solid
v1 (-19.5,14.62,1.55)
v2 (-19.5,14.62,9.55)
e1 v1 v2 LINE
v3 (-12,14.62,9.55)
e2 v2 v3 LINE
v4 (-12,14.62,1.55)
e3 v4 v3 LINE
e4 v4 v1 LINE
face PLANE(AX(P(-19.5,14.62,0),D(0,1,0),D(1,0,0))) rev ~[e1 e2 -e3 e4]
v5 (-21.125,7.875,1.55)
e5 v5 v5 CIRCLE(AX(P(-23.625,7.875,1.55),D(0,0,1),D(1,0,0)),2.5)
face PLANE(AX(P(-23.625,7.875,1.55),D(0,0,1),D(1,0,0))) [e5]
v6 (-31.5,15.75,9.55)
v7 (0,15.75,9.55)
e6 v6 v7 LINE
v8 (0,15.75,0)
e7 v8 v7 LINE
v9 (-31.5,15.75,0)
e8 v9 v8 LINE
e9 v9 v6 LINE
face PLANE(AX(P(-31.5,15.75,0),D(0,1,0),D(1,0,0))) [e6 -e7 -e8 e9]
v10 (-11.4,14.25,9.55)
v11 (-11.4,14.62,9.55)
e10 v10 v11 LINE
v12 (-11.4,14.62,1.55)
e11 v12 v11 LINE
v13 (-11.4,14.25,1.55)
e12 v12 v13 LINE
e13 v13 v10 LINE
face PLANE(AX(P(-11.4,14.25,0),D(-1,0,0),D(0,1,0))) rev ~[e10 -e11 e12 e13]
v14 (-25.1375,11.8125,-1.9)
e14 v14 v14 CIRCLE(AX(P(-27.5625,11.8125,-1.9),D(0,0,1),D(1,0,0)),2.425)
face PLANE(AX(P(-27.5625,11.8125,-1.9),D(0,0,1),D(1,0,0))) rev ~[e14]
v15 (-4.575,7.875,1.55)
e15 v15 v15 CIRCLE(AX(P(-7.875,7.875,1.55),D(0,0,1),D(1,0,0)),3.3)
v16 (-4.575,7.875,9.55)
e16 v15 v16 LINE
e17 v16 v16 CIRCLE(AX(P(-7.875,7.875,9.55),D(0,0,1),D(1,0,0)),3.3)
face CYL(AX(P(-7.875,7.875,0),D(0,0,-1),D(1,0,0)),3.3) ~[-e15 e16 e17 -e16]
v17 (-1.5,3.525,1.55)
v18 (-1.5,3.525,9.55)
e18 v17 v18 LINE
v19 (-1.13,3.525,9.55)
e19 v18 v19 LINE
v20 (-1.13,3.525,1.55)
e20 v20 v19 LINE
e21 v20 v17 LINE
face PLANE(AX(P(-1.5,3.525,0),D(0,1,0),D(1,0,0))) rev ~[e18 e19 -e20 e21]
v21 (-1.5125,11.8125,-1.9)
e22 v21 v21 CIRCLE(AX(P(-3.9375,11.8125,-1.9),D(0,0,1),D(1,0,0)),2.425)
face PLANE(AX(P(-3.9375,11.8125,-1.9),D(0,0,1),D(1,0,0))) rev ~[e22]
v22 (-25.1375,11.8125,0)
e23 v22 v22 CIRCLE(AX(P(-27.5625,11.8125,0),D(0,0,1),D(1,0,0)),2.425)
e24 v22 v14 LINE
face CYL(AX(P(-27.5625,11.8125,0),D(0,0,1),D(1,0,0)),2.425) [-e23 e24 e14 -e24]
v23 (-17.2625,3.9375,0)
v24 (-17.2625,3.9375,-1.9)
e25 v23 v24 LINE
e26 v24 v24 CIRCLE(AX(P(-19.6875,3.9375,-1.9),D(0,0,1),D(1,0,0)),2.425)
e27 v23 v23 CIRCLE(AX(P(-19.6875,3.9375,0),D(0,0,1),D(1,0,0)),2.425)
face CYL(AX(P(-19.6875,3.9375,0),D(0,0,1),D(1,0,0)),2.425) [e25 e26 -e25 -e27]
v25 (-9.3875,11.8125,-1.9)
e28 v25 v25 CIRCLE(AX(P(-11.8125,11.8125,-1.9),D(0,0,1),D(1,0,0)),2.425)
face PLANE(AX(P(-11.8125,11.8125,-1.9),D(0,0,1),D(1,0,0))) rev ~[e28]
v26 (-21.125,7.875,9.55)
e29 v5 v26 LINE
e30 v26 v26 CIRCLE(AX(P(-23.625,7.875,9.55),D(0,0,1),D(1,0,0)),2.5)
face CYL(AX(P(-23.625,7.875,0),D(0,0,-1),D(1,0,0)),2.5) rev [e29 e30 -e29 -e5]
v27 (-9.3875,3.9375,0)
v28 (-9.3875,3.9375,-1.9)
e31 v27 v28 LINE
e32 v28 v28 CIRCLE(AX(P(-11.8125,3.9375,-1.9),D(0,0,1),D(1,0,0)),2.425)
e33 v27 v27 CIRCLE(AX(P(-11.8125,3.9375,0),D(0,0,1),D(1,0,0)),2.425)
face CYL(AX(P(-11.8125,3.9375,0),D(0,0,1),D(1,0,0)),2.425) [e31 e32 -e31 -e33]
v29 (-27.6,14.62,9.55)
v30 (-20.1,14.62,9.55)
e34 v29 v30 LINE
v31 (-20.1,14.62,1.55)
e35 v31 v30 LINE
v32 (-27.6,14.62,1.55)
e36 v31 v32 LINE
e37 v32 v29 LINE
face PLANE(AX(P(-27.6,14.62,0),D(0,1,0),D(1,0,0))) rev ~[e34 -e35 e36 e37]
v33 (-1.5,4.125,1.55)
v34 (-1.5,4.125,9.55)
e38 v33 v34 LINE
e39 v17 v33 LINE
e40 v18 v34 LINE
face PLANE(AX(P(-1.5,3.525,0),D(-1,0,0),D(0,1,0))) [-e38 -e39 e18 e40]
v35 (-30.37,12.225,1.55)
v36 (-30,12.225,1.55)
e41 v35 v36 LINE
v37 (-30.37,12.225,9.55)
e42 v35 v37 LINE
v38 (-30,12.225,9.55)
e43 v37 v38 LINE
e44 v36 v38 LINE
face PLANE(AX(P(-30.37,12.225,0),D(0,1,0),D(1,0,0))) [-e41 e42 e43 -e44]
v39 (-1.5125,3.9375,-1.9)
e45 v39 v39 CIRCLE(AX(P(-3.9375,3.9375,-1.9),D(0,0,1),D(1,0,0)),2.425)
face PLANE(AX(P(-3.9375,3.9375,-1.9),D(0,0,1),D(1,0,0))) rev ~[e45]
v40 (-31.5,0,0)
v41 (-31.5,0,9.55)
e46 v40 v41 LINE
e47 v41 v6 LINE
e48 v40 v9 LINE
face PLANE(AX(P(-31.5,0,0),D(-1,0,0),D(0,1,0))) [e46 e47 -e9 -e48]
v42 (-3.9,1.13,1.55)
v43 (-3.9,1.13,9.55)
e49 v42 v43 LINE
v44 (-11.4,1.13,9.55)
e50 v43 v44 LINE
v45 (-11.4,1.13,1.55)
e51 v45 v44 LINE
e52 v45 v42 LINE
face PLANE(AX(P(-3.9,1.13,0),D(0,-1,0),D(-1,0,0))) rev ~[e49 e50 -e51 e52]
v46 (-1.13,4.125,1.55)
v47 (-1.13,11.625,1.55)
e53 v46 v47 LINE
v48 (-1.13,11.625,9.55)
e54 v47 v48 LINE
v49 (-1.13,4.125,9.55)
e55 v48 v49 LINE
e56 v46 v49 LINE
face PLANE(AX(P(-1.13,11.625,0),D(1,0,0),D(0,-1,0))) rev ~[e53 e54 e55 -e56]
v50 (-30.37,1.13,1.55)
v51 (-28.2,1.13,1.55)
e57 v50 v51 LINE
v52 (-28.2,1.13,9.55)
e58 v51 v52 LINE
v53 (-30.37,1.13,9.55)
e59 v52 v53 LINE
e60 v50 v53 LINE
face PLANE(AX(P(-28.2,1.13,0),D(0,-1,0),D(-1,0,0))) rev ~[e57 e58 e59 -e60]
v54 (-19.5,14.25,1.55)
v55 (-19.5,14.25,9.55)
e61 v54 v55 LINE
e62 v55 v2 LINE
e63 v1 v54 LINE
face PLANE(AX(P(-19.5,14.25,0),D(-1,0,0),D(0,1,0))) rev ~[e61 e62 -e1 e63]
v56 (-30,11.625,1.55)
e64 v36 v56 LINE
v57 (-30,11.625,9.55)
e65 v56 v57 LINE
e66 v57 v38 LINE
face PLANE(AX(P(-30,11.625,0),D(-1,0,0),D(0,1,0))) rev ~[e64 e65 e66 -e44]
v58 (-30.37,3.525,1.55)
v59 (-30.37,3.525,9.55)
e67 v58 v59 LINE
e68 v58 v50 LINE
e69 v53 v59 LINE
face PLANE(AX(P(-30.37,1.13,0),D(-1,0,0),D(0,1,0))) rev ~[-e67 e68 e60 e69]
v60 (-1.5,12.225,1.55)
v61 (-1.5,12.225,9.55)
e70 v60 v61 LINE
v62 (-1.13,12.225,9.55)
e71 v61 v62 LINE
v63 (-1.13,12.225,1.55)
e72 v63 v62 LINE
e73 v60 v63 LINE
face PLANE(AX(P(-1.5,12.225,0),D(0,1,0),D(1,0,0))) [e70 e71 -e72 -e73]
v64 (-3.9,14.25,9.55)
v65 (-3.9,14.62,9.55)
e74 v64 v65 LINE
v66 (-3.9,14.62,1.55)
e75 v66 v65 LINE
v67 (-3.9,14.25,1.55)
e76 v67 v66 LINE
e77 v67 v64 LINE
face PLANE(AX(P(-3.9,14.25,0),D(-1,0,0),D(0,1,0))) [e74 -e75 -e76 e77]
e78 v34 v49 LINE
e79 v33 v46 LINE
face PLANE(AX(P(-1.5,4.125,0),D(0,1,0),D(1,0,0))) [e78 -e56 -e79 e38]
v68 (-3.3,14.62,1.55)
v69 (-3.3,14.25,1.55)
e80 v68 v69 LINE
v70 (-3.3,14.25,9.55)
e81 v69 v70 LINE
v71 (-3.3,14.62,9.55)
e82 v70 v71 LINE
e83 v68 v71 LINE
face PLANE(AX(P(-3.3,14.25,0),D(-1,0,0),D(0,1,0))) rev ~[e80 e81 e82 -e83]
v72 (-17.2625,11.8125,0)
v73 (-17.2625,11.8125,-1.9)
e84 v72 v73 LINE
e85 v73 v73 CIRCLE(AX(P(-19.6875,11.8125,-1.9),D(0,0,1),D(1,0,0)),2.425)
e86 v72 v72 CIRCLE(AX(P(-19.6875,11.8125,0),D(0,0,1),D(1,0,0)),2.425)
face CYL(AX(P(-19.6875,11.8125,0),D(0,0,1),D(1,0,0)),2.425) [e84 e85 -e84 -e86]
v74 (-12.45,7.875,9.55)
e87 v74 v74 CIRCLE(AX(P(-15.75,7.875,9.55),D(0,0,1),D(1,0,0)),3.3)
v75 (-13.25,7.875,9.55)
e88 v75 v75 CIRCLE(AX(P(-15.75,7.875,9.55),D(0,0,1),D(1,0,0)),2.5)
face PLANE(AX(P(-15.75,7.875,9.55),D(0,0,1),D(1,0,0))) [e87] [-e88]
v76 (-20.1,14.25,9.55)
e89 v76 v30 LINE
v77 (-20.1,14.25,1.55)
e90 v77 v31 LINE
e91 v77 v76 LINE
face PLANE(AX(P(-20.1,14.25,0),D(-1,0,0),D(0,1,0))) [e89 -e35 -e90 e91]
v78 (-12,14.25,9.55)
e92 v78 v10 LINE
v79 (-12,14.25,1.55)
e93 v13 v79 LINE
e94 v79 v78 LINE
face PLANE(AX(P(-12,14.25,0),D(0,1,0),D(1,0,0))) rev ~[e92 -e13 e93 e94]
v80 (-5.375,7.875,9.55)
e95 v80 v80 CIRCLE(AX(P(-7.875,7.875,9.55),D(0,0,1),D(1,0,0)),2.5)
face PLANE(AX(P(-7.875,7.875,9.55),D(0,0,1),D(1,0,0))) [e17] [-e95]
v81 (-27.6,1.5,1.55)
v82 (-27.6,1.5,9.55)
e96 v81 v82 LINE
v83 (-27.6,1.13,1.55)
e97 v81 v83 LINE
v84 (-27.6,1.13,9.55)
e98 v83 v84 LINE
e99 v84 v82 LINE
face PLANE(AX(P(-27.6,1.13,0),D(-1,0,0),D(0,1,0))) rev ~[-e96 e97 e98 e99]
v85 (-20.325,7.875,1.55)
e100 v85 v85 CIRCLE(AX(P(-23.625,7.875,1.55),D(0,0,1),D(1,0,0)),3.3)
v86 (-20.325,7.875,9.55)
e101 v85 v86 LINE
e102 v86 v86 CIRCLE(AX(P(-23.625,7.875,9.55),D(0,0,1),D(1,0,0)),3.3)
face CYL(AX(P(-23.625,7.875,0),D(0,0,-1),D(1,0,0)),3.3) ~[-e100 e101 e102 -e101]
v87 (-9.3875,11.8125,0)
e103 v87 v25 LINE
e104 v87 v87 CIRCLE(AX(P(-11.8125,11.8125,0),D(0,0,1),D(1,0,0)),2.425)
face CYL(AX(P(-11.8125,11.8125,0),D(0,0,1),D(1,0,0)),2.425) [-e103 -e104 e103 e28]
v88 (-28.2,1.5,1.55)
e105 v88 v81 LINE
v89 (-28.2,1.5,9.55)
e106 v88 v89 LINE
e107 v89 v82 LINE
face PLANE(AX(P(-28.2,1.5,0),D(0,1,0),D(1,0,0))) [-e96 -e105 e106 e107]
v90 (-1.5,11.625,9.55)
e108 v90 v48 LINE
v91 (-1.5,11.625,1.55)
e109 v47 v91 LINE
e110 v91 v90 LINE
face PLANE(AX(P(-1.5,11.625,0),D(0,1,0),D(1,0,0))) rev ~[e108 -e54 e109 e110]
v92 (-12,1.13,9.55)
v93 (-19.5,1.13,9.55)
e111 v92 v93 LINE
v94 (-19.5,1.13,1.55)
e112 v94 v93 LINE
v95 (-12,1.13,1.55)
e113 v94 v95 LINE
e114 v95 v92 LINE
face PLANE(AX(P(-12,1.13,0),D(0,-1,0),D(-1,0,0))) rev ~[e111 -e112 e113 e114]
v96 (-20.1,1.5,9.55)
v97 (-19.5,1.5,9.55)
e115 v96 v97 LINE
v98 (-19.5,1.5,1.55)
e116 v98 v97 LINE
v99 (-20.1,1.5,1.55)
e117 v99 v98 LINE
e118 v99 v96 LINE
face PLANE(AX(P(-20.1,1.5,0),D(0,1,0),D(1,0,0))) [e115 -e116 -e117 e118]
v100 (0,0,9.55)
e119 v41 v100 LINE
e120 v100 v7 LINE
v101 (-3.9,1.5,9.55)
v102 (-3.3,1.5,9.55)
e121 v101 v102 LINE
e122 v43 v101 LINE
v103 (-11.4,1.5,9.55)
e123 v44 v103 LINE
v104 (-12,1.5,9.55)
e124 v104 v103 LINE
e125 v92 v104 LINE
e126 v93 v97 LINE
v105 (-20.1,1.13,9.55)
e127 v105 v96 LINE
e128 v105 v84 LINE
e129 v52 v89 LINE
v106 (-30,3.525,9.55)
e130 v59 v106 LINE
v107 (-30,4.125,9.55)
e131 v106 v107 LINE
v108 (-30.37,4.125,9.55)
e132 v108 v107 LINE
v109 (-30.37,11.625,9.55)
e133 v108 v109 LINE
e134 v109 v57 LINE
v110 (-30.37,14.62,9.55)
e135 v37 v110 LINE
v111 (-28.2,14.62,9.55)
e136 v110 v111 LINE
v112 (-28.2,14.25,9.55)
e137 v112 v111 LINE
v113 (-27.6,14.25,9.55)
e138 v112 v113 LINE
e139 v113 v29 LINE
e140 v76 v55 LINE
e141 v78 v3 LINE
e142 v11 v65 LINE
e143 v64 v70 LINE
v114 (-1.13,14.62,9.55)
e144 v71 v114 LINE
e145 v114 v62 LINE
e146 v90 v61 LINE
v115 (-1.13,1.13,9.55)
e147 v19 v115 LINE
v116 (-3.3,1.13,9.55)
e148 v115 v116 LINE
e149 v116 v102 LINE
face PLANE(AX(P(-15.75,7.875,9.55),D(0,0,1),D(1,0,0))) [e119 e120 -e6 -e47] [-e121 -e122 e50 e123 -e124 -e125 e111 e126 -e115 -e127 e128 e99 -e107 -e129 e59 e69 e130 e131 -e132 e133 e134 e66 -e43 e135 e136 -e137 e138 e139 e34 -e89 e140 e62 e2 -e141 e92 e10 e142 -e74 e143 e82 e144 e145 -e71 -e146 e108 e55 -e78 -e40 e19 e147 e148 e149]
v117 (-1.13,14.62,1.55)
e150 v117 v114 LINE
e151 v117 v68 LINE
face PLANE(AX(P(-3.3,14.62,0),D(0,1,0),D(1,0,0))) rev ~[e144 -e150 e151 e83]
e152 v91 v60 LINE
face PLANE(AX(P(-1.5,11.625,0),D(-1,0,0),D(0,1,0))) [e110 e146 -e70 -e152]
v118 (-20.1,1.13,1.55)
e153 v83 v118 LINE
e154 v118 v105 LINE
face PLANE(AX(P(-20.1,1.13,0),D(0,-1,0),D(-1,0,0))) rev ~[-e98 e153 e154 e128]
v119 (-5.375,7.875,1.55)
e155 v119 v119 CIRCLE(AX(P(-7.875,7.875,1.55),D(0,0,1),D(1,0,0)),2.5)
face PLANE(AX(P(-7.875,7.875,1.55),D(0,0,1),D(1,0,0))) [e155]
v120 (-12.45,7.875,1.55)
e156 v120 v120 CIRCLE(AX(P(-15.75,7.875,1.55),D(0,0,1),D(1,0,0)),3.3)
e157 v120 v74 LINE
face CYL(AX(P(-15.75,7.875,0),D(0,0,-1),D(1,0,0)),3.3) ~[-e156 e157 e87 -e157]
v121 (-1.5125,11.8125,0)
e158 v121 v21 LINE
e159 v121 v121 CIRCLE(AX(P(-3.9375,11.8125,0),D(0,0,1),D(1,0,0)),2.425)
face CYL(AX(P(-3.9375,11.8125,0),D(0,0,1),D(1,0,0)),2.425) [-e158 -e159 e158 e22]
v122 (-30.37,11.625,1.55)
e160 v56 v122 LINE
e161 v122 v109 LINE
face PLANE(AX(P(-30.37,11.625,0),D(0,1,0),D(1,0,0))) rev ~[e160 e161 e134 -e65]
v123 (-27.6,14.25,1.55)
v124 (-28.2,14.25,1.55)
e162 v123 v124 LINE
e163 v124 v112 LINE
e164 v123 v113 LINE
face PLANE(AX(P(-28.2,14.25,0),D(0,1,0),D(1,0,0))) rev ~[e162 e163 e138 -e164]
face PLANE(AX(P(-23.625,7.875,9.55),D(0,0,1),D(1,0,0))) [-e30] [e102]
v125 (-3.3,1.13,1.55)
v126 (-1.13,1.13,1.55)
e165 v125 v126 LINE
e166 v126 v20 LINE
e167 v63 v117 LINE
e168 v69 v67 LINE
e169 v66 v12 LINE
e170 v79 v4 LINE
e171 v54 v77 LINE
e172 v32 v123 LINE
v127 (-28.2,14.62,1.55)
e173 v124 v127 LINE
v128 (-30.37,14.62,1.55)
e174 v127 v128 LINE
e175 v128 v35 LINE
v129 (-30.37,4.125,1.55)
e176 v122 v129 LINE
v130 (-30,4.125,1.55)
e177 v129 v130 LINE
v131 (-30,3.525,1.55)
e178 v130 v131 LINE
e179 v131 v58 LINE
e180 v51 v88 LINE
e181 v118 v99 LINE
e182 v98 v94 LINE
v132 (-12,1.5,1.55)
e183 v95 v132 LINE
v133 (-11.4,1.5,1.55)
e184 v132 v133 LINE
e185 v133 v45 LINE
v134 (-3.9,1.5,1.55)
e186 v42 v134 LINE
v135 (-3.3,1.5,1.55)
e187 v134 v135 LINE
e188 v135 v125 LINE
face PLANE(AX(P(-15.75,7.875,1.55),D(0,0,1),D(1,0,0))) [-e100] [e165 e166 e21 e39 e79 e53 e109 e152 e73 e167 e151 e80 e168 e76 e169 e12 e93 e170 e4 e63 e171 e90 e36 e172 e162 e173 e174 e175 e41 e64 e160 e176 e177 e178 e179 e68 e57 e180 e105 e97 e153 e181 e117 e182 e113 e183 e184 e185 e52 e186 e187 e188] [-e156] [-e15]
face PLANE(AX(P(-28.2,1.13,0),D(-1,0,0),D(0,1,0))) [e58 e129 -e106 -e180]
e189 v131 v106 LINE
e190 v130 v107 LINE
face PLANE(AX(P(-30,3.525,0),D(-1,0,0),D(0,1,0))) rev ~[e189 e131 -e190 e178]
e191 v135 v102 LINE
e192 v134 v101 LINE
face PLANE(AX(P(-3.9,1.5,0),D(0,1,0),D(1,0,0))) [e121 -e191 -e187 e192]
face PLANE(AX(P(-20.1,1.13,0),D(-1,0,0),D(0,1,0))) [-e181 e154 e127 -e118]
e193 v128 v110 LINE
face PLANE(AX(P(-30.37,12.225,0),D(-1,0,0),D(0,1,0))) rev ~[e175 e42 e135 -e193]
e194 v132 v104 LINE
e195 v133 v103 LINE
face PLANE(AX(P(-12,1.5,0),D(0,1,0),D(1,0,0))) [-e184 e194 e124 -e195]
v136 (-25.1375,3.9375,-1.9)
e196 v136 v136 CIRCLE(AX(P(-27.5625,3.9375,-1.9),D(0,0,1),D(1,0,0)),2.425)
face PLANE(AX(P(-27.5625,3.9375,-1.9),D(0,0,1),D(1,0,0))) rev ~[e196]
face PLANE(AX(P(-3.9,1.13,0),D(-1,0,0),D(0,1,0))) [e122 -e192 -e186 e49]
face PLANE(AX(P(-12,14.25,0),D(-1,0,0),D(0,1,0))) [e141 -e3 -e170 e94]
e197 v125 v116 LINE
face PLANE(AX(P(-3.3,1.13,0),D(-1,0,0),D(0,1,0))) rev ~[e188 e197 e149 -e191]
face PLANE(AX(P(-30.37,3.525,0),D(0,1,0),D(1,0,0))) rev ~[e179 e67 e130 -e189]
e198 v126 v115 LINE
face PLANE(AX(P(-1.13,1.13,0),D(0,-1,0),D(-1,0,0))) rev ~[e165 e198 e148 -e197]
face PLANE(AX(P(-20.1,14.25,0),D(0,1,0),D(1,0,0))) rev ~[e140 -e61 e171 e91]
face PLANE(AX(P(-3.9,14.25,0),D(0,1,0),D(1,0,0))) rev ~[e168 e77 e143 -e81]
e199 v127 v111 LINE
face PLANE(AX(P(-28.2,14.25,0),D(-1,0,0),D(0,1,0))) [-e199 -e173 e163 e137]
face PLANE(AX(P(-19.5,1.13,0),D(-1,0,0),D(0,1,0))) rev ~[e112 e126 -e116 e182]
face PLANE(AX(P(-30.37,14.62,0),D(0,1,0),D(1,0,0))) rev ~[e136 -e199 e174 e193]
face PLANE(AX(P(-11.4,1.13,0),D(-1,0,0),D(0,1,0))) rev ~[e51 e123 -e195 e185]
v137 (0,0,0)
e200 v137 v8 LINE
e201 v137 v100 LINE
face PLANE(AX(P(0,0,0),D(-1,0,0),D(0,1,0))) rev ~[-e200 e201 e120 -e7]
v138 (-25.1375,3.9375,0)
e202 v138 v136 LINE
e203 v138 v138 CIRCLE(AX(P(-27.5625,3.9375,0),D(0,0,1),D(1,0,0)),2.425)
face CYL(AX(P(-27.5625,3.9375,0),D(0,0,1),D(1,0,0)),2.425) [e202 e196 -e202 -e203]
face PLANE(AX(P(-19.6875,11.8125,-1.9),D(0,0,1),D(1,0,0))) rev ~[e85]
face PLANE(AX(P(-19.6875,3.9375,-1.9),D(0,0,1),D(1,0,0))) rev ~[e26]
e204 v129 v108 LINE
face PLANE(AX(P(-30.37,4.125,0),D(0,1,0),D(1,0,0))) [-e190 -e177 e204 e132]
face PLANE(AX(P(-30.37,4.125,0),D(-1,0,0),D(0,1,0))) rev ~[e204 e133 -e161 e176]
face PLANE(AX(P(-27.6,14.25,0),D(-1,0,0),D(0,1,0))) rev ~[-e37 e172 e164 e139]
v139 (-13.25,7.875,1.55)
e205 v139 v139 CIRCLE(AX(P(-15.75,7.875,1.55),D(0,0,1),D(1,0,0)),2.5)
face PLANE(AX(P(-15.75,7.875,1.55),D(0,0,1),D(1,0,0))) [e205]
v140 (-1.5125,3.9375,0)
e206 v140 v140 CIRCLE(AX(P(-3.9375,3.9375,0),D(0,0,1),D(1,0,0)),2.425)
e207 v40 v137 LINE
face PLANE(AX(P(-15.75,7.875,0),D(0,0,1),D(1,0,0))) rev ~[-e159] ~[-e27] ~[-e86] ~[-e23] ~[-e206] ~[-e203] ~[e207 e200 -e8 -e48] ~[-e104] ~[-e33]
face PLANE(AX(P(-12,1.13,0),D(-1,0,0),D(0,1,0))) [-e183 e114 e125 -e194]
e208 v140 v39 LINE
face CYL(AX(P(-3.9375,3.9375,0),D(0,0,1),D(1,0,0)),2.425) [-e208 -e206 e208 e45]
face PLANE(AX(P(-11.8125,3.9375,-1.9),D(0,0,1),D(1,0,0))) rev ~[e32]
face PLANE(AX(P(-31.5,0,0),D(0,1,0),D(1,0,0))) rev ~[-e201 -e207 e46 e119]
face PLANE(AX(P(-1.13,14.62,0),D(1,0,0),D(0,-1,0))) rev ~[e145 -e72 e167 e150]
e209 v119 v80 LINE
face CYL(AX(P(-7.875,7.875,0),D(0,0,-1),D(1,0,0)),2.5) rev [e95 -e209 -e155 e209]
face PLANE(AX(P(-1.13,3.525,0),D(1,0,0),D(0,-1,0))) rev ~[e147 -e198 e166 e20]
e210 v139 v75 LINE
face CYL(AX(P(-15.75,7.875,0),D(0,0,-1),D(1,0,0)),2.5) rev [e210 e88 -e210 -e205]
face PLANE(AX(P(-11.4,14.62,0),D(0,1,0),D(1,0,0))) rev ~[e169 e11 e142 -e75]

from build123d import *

# Parameters (mm, degrees)
F0_W     = 31.5
F0_H     = 15.75
F0_W_2   = 0.37
F0_H_2   = 0.6
F0_W_3   = 0.6
F0_H_3   = 0.37
F1_DEPTH = 9.55
F0_R     = 3.3
F0_R_2   = 2.5
F2_DEPTH = 1.55
F3_R     = 2.425
F4_DEPTH = 1.9


# Not quite as in the source:
# - a feature names something its author has since deleted; it is built from what else it names


with BuildPart() as f1:
    # F0 (on Top) → F1 (new body)
    with BuildSketch(Plane.XY):
        with Locations((-15.75, 7.875)):
            Rectangle(F0_W, F0_H)
        Polygon((-30.37, 12.225), (-30.37, 14.62), (-28.2, 14.62), (-27.6, 14.62), (-20.1, 14.62), (-19.5, 14.62), (-12, 14.62), (-11.4, 14.62), (-3.9, 14.62), (-3.3, 14.62), (-1.13, 14.62), (-1.13, 12.225), (-1.13, 11.625), (-1.13, 4.125), (-1.13, 3.525), (-1.13, 1.13), (-3.3, 1.13), (-3.9, 1.13), (-11.4, 1.13), (-12, 1.13), (-19.5, 1.13), (-20.1, 1.13), (-27.6, 1.13), (-28.2, 1.13), (-30.37, 1.13), (-30.37, 3.525), (-30.37, 4.125), (-30.37, 11.625), align=None, mode=Mode.SUBTRACT)
        with Locations((-30.185, 11.925)):
            Rectangle(F0_W_2, F0_H_2)
        with Locations((-27.9, 14.435)):
            Rectangle(F0_W_3, F0_H_3)
        with Locations((-19.8, 14.435)):
            Rectangle(F0_W_3, F0_H_3)
        with Locations((-11.7, 14.435)):
            Rectangle(F0_W_3, F0_H_3)
        with Locations((-3.6, 14.435)):
            Rectangle(F0_W_3, F0_H_3)
        with Locations((-1.315, 11.925)):
            Rectangle(F0_W_2, F0_H_2)
        with Locations((-1.315, 3.825)):
            Rectangle(F0_W_2, F0_H_2)
        with Locations((-3.6, 1.315)):
            Rectangle(F0_W_3, F0_H_3)
        with Locations((-11.7, 1.315)):
            Rectangle(F0_W_3, F0_H_3)
        with Locations((-19.8, 1.315)):
            Rectangle(F0_W_3, F0_H_3)
        with Locations((-27.9, 1.315)):
            Rectangle(F0_W_3, F0_H_3)
        with Locations((-30.185, 3.825)):
            Rectangle(F0_W_2, F0_H_2)
    extrude(amount=F1_DEPTH)



with BuildPart() as f1b:
    # F0 (on Top) → F1, piece 2 (new body)
    with BuildSketch(Plane.XY):
        with Locations((-23.625, 7.875)):
            Circle(F0_R)
        with Locations((-23.625, 7.875)):
            Circle(F0_R_2, mode=Mode.SUBTRACT)
    extrude(amount=F1_DEPTH)


with BuildPart() as f1c:
    # F0 (on Top) → F1, piece 3 (new body)
    with BuildSketch(Plane.XY):
        with Locations((-7.875, 7.875)):
            Circle(F0_R)
        with Locations((-7.875, 7.875)):
            Circle(F0_R_2, mode=Mode.SUBTRACT)
    extrude(amount=F1_DEPTH)


with BuildPart() as f1d:
    # F0 (on Top) → F1, piece 4 (new body)
    with BuildSketch(Plane.XY):
        with Locations((-15.75, 7.875)):
            Circle(F0_R)
        with Locations((-15.75, 7.875)):
            Circle(F0_R_2, mode=Mode.SUBTRACT)
    extrude(amount=F1_DEPTH)


with BuildPart() as f1_1:
    add(f1.part)

    add(f1b.part)  # F2 merges F1b

    add(f1c.part)  # F2 merges F1c

    add(f1d.part)  # F2 merges F1d
    # F0 (on Top) → F2 (join)
    with BuildSketch(Plane.XY):
        Polygon((-28.2, 14.62), (-30.37, 14.62), (-30.37, 12.225), (-30, 12.225), (-30, 11.625), (-30.37, 11.625), (-30.37, 4.125), (-30, 4.125), (-30, 3.525), (-30.37, 3.525), (-30.37, 1.13), (-28.2, 1.13), (-28.2, 1.5), (-27.6, 1.5), (-27.6, 1.13), (-20.1, 1.13), (-20.1, 1.5), (-19.5, 1.5), (-19.5, 1.13), (-12, 1.13), (-12, 1.5), (-11.4, 1.5), (-11.4, 1.13), (-3.9, 1.13), (-3.9, 1.5), (-3.3, 1.5), (-3.3, 1.13), (-1.13, 1.13), (-1.13, 3.525), (-1.5, 3.525), (-1.5, 4.125), (-1.13, 4.125), (-1.13, 11.625), (-1.5, 11.625), (-1.5, 12.225), (-1.13, 12.225), (-1.13, 14.62), (-3.3, 14.62), (-3.3, 14.25), (-3.9, 14.25), (-3.9, 14.62), (-11.4, 14.62), (-11.4, 14.25), (-12, 14.25), (-12, 14.62), (-19.5, 14.62), (-19.5, 14.25), (-20.1, 14.25), (-20.1, 14.62), (-27.6, 14.62), (-27.6, 14.25), (-28.2, 14.25), align=None)
        with Locations((-23.625, 7.875)):
            Circle(F0_R, mode=Mode.SUBTRACT)
        with Locations((-15.75, 7.875)):
            Circle(F0_R, mode=Mode.SUBTRACT)
        with Locations((-7.875, 7.875)):
            Circle(F0_R, mode=Mode.SUBTRACT)
        with Locations((-23.625, 7.875)):
            Circle(F0_R_2)
        with Locations((-7.875, 7.875)):
            Circle(F0_R_2)
        with Locations((-15.75, 7.875)):
            Circle(F0_R_2)
    extrude(amount=F2_DEPTH)

    # F3 (on face) → F4 (join)
    with BuildSketch(Plane.XY):
        with Locations((-27.5625, 3.9375)):
            Circle(F3_R)
        with Locations((-11.8125, 3.9375)):
            Circle(F3_R)
        with Locations((-3.9375, 3.9375)):
            Circle(F3_R)
        with Locations((-3.9375, 11.8125)):
            Circle(F3_R)
        with Locations((-11.8125, 11.8125)):
            Circle(F3_R)
        with Locations((-19.6875, 11.8125)):
            Circle(F3_R)
        with Locations((-27.5625, 11.8125)):
            Circle(F3_R)
        with Locations((-19.6875, 3.9375)):
            Circle(F3_R)
    extrude(amount=-F4_DEPTH)


solid = f1_1.part
